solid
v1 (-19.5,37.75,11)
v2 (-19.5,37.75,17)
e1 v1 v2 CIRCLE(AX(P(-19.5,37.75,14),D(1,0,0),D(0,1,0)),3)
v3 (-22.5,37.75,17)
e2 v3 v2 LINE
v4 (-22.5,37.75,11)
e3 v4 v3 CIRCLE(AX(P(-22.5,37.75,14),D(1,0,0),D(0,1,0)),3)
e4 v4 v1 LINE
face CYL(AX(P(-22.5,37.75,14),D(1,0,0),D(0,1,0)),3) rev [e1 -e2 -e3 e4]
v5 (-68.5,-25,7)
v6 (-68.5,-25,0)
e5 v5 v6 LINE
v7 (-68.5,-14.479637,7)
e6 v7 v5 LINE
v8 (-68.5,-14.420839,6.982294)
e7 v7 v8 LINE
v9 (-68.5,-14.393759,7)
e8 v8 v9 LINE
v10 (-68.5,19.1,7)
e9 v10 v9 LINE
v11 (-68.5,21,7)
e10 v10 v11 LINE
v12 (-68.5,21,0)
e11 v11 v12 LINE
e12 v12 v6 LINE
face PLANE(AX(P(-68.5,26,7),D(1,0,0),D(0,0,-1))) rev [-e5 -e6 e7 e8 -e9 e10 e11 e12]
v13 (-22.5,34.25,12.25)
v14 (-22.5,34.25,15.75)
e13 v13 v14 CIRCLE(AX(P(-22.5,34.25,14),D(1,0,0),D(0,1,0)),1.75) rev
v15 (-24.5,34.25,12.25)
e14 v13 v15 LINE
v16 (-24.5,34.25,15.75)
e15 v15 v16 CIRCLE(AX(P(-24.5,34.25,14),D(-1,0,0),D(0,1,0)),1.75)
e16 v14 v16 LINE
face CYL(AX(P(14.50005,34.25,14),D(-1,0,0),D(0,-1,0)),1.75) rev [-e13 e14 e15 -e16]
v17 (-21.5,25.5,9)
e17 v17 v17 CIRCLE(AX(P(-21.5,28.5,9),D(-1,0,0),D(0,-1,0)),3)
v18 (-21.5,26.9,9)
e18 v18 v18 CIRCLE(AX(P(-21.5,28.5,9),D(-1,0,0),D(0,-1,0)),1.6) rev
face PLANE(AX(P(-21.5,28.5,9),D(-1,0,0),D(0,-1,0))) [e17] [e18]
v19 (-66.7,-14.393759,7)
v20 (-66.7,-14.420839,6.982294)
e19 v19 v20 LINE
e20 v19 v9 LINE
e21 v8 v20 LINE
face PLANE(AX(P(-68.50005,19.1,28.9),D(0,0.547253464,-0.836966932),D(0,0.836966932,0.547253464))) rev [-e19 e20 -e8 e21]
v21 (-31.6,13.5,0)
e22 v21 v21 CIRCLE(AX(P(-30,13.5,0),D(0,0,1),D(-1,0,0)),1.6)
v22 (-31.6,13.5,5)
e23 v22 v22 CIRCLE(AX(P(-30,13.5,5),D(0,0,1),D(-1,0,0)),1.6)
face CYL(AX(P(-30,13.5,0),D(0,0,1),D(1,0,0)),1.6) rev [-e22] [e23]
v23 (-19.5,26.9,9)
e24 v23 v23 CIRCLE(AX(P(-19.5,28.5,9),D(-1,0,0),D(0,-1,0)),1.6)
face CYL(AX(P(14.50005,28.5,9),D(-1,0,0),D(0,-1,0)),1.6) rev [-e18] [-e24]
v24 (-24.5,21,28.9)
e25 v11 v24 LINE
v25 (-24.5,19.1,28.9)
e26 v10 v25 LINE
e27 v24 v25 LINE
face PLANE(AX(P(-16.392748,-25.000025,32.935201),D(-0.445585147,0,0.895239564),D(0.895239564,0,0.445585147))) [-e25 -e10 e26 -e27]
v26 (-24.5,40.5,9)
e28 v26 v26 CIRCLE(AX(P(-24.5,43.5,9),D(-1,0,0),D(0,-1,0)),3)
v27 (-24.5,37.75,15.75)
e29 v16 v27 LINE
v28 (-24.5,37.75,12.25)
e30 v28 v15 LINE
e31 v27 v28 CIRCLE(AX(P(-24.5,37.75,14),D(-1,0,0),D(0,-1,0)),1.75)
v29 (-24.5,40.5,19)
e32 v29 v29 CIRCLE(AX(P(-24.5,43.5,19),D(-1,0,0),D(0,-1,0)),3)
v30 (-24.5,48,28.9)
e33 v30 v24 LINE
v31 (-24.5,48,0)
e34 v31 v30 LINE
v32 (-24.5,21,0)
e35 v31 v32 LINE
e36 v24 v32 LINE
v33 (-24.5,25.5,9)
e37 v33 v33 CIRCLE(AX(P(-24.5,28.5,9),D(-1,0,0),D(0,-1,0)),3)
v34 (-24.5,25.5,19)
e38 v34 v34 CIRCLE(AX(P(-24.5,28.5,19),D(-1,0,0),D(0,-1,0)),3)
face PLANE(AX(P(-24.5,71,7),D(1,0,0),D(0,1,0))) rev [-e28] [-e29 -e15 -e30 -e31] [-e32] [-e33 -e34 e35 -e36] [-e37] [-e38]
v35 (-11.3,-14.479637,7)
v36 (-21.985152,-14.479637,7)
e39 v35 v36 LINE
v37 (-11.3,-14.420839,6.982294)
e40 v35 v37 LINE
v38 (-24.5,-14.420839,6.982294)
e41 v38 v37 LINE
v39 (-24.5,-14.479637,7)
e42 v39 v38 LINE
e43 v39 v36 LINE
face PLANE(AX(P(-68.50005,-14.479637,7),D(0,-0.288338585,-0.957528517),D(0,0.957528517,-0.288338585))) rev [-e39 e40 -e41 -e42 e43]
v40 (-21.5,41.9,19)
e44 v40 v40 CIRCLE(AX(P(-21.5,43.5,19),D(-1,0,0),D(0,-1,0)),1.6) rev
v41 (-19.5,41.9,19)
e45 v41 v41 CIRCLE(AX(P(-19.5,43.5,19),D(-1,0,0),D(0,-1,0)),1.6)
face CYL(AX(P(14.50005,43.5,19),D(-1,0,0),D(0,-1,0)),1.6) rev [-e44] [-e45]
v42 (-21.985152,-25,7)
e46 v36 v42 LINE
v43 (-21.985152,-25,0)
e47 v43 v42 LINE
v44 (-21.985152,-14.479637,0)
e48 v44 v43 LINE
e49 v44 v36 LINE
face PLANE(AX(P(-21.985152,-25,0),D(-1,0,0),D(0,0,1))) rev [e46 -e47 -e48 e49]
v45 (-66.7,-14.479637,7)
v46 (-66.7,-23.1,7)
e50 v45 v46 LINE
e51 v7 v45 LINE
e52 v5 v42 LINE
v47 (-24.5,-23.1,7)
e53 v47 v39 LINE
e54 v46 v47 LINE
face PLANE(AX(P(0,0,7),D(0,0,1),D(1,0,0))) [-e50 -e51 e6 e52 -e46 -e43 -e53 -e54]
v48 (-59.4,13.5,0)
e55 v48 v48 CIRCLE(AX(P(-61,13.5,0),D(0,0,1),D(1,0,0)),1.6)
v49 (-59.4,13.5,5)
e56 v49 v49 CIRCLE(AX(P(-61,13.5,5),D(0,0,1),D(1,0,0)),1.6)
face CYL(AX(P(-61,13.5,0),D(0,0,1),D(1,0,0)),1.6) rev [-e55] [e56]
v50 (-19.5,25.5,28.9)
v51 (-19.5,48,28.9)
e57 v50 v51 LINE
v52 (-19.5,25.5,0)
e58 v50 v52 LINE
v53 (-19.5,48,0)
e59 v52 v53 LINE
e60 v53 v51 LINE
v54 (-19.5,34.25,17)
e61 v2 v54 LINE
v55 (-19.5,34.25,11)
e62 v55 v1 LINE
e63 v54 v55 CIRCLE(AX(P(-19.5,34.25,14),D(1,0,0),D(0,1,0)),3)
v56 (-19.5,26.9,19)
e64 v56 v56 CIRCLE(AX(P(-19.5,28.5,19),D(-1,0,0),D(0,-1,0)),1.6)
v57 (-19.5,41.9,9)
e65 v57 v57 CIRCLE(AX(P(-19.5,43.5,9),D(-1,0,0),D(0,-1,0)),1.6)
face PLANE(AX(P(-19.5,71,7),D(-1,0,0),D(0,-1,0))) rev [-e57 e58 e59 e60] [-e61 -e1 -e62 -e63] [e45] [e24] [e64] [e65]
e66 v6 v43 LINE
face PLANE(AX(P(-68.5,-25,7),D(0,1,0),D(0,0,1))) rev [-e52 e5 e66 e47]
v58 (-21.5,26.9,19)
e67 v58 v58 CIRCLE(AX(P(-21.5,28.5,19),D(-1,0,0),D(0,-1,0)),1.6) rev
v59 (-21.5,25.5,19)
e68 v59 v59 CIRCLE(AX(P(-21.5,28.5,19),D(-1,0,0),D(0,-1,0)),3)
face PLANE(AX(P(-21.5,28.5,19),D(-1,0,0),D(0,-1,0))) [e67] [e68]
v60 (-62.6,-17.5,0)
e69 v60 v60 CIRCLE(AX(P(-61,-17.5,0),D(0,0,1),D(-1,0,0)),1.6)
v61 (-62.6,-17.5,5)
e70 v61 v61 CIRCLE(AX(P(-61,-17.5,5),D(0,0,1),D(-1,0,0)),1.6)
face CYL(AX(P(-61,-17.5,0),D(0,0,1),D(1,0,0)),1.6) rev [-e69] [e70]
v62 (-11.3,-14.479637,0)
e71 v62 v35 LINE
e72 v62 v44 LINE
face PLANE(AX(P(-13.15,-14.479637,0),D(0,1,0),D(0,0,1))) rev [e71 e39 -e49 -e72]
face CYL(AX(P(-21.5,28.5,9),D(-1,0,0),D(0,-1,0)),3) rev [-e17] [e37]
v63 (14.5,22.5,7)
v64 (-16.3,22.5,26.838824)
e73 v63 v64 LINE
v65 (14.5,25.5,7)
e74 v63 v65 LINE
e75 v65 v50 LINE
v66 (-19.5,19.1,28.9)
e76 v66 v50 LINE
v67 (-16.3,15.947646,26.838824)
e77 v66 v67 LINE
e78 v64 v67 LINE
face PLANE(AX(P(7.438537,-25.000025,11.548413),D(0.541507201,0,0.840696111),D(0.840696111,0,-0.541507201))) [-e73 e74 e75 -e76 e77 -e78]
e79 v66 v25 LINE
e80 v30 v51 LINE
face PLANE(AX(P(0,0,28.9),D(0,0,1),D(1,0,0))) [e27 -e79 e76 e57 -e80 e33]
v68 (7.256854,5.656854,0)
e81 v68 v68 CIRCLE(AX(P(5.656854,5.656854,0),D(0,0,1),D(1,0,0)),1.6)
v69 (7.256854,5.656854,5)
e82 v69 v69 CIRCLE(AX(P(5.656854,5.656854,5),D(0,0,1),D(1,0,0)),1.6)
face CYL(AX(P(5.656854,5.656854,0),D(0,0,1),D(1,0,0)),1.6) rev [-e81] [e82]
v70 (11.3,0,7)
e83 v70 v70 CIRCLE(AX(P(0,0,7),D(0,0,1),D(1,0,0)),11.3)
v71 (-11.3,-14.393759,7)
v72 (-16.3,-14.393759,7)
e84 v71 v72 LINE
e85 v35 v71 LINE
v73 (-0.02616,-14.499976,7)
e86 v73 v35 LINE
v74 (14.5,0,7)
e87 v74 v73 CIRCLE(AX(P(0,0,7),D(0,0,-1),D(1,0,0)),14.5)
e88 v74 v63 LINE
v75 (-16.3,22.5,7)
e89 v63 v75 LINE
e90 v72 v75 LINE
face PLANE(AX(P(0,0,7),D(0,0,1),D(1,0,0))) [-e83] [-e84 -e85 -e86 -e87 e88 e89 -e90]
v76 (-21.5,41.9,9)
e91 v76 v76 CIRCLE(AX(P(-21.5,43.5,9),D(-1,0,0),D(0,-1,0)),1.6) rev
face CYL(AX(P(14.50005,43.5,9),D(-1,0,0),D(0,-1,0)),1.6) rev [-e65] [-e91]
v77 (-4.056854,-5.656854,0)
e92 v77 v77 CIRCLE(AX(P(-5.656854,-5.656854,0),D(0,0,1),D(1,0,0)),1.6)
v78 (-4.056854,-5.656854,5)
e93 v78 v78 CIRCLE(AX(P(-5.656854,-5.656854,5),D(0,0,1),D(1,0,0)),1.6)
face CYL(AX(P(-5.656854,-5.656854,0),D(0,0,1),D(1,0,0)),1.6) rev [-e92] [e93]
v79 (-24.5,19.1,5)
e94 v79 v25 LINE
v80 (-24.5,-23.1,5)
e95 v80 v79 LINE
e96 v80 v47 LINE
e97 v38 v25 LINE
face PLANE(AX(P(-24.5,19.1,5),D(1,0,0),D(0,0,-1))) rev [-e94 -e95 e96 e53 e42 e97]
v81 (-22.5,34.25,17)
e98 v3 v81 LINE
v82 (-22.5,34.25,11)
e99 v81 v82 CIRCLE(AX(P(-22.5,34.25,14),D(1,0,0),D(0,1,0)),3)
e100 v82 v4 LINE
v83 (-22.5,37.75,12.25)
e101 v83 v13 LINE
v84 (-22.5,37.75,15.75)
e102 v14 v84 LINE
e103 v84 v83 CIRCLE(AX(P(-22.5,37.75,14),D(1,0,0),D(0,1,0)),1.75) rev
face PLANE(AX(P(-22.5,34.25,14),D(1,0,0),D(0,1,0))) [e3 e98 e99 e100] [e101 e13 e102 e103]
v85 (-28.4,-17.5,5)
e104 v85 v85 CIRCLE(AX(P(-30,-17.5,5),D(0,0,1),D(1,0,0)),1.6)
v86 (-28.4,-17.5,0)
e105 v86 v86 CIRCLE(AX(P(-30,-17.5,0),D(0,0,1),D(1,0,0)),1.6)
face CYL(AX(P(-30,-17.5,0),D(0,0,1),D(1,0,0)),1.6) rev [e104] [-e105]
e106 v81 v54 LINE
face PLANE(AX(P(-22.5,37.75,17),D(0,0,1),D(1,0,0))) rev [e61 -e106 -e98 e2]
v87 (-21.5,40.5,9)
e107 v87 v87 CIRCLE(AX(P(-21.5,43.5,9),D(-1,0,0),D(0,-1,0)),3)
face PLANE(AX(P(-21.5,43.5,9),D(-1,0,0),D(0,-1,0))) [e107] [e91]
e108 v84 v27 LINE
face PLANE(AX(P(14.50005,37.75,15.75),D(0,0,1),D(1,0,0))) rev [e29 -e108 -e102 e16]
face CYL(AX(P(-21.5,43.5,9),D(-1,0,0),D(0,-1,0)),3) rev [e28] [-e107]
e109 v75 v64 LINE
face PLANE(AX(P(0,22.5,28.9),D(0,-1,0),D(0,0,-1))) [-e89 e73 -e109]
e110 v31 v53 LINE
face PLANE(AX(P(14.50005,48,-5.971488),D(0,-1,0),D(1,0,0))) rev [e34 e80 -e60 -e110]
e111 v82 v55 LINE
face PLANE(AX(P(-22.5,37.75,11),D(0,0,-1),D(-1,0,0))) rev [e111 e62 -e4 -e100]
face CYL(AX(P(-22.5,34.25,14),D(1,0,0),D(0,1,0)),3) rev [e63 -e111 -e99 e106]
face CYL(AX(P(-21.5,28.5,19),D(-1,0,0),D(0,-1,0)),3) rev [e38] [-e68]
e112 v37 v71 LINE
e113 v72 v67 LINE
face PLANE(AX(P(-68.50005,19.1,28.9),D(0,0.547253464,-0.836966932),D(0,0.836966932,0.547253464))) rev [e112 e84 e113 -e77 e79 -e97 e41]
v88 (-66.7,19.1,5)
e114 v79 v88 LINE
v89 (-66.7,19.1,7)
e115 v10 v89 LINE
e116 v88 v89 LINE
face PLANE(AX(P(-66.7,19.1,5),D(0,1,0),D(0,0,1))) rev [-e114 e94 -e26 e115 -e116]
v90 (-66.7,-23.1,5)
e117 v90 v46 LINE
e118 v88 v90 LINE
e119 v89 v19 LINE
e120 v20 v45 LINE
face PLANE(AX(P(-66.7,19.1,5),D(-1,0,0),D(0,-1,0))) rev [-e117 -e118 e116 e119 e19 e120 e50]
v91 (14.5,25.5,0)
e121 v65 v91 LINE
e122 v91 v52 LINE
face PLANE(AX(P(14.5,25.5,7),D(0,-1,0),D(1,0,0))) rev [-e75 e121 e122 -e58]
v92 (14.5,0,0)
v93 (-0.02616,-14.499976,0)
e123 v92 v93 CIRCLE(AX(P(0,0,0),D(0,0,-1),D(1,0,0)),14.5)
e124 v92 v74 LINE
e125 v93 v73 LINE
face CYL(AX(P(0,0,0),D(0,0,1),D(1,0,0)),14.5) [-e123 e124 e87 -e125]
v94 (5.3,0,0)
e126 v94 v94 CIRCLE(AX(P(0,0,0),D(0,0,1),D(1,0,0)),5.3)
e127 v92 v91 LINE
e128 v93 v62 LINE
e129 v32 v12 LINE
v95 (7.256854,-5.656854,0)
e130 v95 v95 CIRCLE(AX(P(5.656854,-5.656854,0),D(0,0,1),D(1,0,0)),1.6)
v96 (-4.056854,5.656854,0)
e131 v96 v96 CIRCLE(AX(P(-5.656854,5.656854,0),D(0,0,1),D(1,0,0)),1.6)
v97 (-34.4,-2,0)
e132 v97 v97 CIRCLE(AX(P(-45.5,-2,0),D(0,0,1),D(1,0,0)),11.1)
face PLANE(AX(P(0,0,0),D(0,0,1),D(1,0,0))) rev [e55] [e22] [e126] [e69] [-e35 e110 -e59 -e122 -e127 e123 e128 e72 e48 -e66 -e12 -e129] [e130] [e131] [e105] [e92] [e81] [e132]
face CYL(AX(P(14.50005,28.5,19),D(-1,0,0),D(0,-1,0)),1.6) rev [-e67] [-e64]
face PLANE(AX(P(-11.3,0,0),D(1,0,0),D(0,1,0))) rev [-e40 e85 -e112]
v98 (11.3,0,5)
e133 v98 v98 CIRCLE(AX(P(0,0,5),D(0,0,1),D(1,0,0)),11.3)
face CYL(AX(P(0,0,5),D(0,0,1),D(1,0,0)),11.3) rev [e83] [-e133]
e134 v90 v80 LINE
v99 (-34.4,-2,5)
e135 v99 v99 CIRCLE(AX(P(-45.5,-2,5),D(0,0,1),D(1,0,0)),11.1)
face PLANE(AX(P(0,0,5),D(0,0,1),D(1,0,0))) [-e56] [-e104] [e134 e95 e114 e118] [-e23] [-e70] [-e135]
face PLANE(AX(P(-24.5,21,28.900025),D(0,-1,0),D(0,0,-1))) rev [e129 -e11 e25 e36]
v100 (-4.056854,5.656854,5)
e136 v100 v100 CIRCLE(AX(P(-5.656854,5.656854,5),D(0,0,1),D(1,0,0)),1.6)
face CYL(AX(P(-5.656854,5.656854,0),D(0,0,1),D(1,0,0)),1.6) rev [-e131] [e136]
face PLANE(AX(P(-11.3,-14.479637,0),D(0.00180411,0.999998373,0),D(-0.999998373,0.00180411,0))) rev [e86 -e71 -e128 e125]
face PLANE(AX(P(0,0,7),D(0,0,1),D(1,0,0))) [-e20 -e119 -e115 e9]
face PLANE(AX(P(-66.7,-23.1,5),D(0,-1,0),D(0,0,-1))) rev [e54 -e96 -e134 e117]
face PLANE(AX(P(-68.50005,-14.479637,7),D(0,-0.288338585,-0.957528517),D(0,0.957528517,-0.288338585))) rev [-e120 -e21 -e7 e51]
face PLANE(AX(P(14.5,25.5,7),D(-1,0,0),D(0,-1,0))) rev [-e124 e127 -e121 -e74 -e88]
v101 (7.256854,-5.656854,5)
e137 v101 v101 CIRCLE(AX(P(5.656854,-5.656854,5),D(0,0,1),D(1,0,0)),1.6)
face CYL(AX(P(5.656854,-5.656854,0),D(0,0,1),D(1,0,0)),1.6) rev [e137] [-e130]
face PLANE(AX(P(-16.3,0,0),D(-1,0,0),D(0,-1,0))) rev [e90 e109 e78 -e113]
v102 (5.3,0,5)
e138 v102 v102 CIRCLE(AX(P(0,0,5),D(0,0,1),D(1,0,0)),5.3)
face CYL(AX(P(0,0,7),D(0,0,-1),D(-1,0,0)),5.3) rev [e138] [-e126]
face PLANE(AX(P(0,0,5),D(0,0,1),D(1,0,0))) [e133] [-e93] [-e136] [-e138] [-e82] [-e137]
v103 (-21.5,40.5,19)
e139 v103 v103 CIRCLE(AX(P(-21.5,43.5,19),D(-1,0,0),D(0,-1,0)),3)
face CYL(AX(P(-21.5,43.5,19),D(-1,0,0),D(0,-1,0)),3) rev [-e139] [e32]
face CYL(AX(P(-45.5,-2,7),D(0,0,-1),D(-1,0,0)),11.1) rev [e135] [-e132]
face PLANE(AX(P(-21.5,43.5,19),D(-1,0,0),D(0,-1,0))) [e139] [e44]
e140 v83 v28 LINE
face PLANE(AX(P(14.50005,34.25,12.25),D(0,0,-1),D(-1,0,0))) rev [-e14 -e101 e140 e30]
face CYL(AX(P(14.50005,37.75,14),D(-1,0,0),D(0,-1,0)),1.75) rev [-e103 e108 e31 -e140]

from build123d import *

# Parameters (mm, degrees)
SKETCH_1_R               = 5.3
SKETCH_1_R_2             = 11.1
EXTRUDE_1_DEPTH          = 7
SKETCH_2_R               = 11.3
SKETCH_2_W               = 42.2
SKETCH_2_H               = 42.2
CUT_EXTRUDE_1_DEPTH      = 2
SKETCH_3_R               = 1.6
CUT_EXTRUDE_2_DEPTH      = 99.783854956
EXTRUDE_2_DEPTH          = 21.9
CUT_EXTRUDE_3_DEPTH      = 96.645438992
CUT_EXTRUDE_4_DEPTH      = 89.767730623
CUT_EXTRUDE_4_DEPTH_BACK = 10
CUT_EXTRUDE_5_DEPTH      = 102.058695816
SKETCH_8_R               = 1.6
SKETCH_8_W               = 41.679602286
SKETCH_8_H               = 26.376779249
CUT_EXTRUDE_6_DEPTH      = 89.386707145
SKETCH_9_R               = 3
CUT_EXTRUDE_7_DEPTH      = 3
CUT_EXTRUDE_8_DEPTH      = 3
SKETCH_11_W              = 44
SKETCH_11_H              = 5
CUT_EXTRUDE_9_DEPTH      = 89.495536611
SKETCH_12_W              = 37.71360908
SKETCH_12_H              = 40.060480483
CUT_EXTRUDE_11_DEPTH     = 5
SKETCH_13_W              = 8.835151958
SKETCH_13_H              = 10.520362882
CUT_EXTRUDE_12_DEPTH     = 87.463055694


with BuildPart() as part:
    # 草图1 → 凸台-拉伸1 (new body)
    with BuildSketch(Plane.XY):
        Polygon((-68.5, 26), (-24.5, 26), (-24.5, 71), (-19.5, 71), (-19.5, 26), (-19.5, 25.5), (14.5, 25.5), (14.5, -25), (-68.5, -25), align=None)
        Circle(SKETCH_1_R, mode=Mode.SUBTRACT)
        with Locations((-45.5, -2)):
            Circle(SKETCH_1_R_2, mode=Mode.SUBTRACT)
    extrude(amount=EXTRUDE_1_DEPTH)

    # 草图2 → 切除-拉伸1 (cut)
    with BuildSketch(Plane.XY.offset(7)):
        Circle(SKETCH_2_R)
        with Locations((-45.6, -2)):
            Rectangle(SKETCH_2_W, SKETCH_2_H)
    extrude(amount=-CUT_EXTRUDE_1_DEPTH, mode=Mode.SUBTRACT)

    # 草图3 → 切除-拉伸2 (cut, through all)
    with BuildSketch(Plane.XY.offset(5)):
        with Locations((-61, 13.5)):
            Circle(SKETCH_3_R)
        with Locations((-30, 13.5)):
            Circle(SKETCH_3_R)
        with Locations((-30, -17.5)):
            Circle(SKETCH_3_R)
        with Locations((-61, -17.5)):
            Circle(SKETCH_3_R)
        with Locations((5.656854249, 5.656854249)):
            Circle(SKETCH_3_R)
        with Locations((-5.656854249, 5.656854249)):
            Circle(SKETCH_3_R)
        with Locations((5.656854249, -5.656854249)):
            Circle(SKETCH_3_R)
        with Locations((-5.656854249, -5.656854249)):
            Circle(SKETCH_3_R)
    extrude(amount=-CUT_EXTRUDE_2_DEPTH, mode=Mode.SUBTRACT)

    # 草图4 → 凸台-拉伸2 (add)
    with BuildSketch(Plane.XY.offset(7)):
        Polygon((-19.5, 68.4214033), (-24.5, 71), (-24.5, 26), (-68.5, 26), (-68.5, 19.1), (-66.7, 19.1), (-24.5, 19.1), (-24.5, -14.479637118), (-11.3, -14.479637118), (-11.3, 22.5), (14.5, 22.5), (14.5, 25.5), (-19.5, 25.5), align=None)
    extrude(amount=EXTRUDE_2_DEPTH)

    # 草图5 → 切除-拉伸3 (cut, through all)
    with BuildSketch(Plane(origin=(-11.3, 0, 0), x_dir=(0, 0, -1), z_dir=(1, 0, 0))):
        Polygon((-28.9, 19.1), (-28.9, -14.479637118), (-7, -14.479637118), (-6.982294127, -14.420838609), align=None)
    extrude(amount=-CUT_EXTRUDE_3_DEPTH, mode=Mode.SUBTRACT)

    # 草图6 → 切除-拉伸4 (cut, two sides: drawn at the far end of the back side and taken through both)
    with BuildSketch(Plane.XZ.offset(-22.5).offset(-CUT_EXTRUDE_4_DEPTH_BACK)):
        Polygon((-68.5, 28.9), (-68.5, 7), (-24.5, 28.9), align=None)
        Polygon((-19.5, 28.9), (14.5, 7), (14.5, 28.9), align=None)
    extrude(amount=CUT_EXTRUDE_4_DEPTH + CUT_EXTRUDE_4_DEPTH_BACK, mode=Mode.SUBTRACT)

    # 草图7 → 切除-拉伸5 (cut, through all)
    with BuildSketch(Plane.XY.offset(7)):
        with BuildLine():
            Line((-13.15, -14.479637118), (-11.3, -14.479637118))
            Line((-11.3, -14.479637118), (-0.0261596, -14.499976403))
            ThreePointArc((-0.0261596, -14.499976403), (10.243795337, -10.262292975), (14.5, 0))
            Line((14.5, 0), (21.147002499, 0))
            Line((21.147002499, 0), (22.768629324, -44.459429771))
            Line((22.768629324, -44.459429771), (-13.15, -44.459429771))
            Line((-13.15, -44.459429771), (-13.15, -14.479637118))
        make_face()
    extrude(amount=-CUT_EXTRUDE_5_DEPTH, mode=Mode.SUBTRACT)

    # 草图8 → 切除-拉伸6 (cut, through all)
    with BuildSketch(Plane.ZY.offset(24.5)):
        with Locations((19, 28.5)):
            Circle(SKETCH_8_R)
        with Locations((19, 43.5)):
            Circle(SKETCH_8_R)
        with Locations((9, 28.5)):
            Circle(SKETCH_8_R)
        with Locations((9, 43.5)):
            Circle(SKETCH_8_R)
        with Locations((14.868313548, 61.188389625)):
            Rectangle(SKETCH_8_W, SKETCH_8_H)
        with BuildLine():
            Line((15.75, 37.75), (15.75, 34.25))
            ThreePointArc((15.75, 34.25), (14, 32.5), (12.25, 34.25))
            Line((12.25, 34.25), (12.25, 37.75))
            ThreePointArc((12.25, 37.75), (14, 39.5), (15.75, 37.75))
        make_face()
    extrude(amount=-CUT_EXTRUDE_6_DEPTH, mode=Mode.SUBTRACT)

    # 草图9 → 切除-拉伸7 (cut)
    with BuildSketch(Plane.ZY.offset(24.5)):
        with Locations((9, 43.5)):
            Circle(SKETCH_9_R)
        with Locations((19, 43.5)):
            Circle(SKETCH_9_R)
        with Locations((9, 28.5)):
            Circle(SKETCH_9_R)
        with Locations((19, 28.5)):
            Circle(SKETCH_9_R)
    extrude(amount=-CUT_EXTRUDE_7_DEPTH, mode=Mode.SUBTRACT)

    # 草图10 → 切除-拉伸8 (cut)
    with BuildSketch(Plane(origin=(-19.5, 0, 0), x_dir=(0, 0, -1), z_dir=(1, 0, 0))):
        with BuildLine():
            Line((-11, 37.75), (-11, 34.25))
            ThreePointArc((-11, 34.25), (-14, 31.25), (-17, 34.25))
            Line((-17, 34.25), (-17, 37.75))
            ThreePointArc((-17, 37.75), (-14, 40.75), (-11, 37.75))
        make_face()
    extrude(amount=-CUT_EXTRUDE_8_DEPTH, mode=Mode.SUBTRACT)

    # 草图11 → 切除-拉伸9 (cut, through all)
    with BuildSketch(Plane(origin=(0, 0, 0), x_dir=(-1, 0, 0), z_dir=(0, 0, -1))):
        with Locations((46.5, 23.5)):
            Rectangle(SKETCH_11_W, SKETCH_11_H)
    extrude(amount=-CUT_EXTRUDE_9_DEPTH, mode=Mode.SUBTRACT)

    # 草图12 → 切除-拉伸11 (cut)
    with BuildSketch(Plane(origin=(-11.3, 0, 0), x_dir=(0, 0, -1), z_dir=(1, 0, 0))):
        with Locations((-25.85680454, 2.469759758)):
            Rectangle(SKETCH_12_W, SKETCH_12_H)
    extrude(amount=-CUT_EXTRUDE_11_DEPTH, mode=Mode.SUBTRACT)

    # 草图13 → 切除-拉伸12 (cut, through all)
    with BuildSketch(Plane.XY.offset(7)):
        with Locations((-17.567575979, -19.739818559)):
            Rectangle(SKETCH_13_W, SKETCH_13_H)
    extrude(amount=-CUT_EXTRUDE_12_DEPTH, mode=Mode.SUBTRACT)


solid = part.part
